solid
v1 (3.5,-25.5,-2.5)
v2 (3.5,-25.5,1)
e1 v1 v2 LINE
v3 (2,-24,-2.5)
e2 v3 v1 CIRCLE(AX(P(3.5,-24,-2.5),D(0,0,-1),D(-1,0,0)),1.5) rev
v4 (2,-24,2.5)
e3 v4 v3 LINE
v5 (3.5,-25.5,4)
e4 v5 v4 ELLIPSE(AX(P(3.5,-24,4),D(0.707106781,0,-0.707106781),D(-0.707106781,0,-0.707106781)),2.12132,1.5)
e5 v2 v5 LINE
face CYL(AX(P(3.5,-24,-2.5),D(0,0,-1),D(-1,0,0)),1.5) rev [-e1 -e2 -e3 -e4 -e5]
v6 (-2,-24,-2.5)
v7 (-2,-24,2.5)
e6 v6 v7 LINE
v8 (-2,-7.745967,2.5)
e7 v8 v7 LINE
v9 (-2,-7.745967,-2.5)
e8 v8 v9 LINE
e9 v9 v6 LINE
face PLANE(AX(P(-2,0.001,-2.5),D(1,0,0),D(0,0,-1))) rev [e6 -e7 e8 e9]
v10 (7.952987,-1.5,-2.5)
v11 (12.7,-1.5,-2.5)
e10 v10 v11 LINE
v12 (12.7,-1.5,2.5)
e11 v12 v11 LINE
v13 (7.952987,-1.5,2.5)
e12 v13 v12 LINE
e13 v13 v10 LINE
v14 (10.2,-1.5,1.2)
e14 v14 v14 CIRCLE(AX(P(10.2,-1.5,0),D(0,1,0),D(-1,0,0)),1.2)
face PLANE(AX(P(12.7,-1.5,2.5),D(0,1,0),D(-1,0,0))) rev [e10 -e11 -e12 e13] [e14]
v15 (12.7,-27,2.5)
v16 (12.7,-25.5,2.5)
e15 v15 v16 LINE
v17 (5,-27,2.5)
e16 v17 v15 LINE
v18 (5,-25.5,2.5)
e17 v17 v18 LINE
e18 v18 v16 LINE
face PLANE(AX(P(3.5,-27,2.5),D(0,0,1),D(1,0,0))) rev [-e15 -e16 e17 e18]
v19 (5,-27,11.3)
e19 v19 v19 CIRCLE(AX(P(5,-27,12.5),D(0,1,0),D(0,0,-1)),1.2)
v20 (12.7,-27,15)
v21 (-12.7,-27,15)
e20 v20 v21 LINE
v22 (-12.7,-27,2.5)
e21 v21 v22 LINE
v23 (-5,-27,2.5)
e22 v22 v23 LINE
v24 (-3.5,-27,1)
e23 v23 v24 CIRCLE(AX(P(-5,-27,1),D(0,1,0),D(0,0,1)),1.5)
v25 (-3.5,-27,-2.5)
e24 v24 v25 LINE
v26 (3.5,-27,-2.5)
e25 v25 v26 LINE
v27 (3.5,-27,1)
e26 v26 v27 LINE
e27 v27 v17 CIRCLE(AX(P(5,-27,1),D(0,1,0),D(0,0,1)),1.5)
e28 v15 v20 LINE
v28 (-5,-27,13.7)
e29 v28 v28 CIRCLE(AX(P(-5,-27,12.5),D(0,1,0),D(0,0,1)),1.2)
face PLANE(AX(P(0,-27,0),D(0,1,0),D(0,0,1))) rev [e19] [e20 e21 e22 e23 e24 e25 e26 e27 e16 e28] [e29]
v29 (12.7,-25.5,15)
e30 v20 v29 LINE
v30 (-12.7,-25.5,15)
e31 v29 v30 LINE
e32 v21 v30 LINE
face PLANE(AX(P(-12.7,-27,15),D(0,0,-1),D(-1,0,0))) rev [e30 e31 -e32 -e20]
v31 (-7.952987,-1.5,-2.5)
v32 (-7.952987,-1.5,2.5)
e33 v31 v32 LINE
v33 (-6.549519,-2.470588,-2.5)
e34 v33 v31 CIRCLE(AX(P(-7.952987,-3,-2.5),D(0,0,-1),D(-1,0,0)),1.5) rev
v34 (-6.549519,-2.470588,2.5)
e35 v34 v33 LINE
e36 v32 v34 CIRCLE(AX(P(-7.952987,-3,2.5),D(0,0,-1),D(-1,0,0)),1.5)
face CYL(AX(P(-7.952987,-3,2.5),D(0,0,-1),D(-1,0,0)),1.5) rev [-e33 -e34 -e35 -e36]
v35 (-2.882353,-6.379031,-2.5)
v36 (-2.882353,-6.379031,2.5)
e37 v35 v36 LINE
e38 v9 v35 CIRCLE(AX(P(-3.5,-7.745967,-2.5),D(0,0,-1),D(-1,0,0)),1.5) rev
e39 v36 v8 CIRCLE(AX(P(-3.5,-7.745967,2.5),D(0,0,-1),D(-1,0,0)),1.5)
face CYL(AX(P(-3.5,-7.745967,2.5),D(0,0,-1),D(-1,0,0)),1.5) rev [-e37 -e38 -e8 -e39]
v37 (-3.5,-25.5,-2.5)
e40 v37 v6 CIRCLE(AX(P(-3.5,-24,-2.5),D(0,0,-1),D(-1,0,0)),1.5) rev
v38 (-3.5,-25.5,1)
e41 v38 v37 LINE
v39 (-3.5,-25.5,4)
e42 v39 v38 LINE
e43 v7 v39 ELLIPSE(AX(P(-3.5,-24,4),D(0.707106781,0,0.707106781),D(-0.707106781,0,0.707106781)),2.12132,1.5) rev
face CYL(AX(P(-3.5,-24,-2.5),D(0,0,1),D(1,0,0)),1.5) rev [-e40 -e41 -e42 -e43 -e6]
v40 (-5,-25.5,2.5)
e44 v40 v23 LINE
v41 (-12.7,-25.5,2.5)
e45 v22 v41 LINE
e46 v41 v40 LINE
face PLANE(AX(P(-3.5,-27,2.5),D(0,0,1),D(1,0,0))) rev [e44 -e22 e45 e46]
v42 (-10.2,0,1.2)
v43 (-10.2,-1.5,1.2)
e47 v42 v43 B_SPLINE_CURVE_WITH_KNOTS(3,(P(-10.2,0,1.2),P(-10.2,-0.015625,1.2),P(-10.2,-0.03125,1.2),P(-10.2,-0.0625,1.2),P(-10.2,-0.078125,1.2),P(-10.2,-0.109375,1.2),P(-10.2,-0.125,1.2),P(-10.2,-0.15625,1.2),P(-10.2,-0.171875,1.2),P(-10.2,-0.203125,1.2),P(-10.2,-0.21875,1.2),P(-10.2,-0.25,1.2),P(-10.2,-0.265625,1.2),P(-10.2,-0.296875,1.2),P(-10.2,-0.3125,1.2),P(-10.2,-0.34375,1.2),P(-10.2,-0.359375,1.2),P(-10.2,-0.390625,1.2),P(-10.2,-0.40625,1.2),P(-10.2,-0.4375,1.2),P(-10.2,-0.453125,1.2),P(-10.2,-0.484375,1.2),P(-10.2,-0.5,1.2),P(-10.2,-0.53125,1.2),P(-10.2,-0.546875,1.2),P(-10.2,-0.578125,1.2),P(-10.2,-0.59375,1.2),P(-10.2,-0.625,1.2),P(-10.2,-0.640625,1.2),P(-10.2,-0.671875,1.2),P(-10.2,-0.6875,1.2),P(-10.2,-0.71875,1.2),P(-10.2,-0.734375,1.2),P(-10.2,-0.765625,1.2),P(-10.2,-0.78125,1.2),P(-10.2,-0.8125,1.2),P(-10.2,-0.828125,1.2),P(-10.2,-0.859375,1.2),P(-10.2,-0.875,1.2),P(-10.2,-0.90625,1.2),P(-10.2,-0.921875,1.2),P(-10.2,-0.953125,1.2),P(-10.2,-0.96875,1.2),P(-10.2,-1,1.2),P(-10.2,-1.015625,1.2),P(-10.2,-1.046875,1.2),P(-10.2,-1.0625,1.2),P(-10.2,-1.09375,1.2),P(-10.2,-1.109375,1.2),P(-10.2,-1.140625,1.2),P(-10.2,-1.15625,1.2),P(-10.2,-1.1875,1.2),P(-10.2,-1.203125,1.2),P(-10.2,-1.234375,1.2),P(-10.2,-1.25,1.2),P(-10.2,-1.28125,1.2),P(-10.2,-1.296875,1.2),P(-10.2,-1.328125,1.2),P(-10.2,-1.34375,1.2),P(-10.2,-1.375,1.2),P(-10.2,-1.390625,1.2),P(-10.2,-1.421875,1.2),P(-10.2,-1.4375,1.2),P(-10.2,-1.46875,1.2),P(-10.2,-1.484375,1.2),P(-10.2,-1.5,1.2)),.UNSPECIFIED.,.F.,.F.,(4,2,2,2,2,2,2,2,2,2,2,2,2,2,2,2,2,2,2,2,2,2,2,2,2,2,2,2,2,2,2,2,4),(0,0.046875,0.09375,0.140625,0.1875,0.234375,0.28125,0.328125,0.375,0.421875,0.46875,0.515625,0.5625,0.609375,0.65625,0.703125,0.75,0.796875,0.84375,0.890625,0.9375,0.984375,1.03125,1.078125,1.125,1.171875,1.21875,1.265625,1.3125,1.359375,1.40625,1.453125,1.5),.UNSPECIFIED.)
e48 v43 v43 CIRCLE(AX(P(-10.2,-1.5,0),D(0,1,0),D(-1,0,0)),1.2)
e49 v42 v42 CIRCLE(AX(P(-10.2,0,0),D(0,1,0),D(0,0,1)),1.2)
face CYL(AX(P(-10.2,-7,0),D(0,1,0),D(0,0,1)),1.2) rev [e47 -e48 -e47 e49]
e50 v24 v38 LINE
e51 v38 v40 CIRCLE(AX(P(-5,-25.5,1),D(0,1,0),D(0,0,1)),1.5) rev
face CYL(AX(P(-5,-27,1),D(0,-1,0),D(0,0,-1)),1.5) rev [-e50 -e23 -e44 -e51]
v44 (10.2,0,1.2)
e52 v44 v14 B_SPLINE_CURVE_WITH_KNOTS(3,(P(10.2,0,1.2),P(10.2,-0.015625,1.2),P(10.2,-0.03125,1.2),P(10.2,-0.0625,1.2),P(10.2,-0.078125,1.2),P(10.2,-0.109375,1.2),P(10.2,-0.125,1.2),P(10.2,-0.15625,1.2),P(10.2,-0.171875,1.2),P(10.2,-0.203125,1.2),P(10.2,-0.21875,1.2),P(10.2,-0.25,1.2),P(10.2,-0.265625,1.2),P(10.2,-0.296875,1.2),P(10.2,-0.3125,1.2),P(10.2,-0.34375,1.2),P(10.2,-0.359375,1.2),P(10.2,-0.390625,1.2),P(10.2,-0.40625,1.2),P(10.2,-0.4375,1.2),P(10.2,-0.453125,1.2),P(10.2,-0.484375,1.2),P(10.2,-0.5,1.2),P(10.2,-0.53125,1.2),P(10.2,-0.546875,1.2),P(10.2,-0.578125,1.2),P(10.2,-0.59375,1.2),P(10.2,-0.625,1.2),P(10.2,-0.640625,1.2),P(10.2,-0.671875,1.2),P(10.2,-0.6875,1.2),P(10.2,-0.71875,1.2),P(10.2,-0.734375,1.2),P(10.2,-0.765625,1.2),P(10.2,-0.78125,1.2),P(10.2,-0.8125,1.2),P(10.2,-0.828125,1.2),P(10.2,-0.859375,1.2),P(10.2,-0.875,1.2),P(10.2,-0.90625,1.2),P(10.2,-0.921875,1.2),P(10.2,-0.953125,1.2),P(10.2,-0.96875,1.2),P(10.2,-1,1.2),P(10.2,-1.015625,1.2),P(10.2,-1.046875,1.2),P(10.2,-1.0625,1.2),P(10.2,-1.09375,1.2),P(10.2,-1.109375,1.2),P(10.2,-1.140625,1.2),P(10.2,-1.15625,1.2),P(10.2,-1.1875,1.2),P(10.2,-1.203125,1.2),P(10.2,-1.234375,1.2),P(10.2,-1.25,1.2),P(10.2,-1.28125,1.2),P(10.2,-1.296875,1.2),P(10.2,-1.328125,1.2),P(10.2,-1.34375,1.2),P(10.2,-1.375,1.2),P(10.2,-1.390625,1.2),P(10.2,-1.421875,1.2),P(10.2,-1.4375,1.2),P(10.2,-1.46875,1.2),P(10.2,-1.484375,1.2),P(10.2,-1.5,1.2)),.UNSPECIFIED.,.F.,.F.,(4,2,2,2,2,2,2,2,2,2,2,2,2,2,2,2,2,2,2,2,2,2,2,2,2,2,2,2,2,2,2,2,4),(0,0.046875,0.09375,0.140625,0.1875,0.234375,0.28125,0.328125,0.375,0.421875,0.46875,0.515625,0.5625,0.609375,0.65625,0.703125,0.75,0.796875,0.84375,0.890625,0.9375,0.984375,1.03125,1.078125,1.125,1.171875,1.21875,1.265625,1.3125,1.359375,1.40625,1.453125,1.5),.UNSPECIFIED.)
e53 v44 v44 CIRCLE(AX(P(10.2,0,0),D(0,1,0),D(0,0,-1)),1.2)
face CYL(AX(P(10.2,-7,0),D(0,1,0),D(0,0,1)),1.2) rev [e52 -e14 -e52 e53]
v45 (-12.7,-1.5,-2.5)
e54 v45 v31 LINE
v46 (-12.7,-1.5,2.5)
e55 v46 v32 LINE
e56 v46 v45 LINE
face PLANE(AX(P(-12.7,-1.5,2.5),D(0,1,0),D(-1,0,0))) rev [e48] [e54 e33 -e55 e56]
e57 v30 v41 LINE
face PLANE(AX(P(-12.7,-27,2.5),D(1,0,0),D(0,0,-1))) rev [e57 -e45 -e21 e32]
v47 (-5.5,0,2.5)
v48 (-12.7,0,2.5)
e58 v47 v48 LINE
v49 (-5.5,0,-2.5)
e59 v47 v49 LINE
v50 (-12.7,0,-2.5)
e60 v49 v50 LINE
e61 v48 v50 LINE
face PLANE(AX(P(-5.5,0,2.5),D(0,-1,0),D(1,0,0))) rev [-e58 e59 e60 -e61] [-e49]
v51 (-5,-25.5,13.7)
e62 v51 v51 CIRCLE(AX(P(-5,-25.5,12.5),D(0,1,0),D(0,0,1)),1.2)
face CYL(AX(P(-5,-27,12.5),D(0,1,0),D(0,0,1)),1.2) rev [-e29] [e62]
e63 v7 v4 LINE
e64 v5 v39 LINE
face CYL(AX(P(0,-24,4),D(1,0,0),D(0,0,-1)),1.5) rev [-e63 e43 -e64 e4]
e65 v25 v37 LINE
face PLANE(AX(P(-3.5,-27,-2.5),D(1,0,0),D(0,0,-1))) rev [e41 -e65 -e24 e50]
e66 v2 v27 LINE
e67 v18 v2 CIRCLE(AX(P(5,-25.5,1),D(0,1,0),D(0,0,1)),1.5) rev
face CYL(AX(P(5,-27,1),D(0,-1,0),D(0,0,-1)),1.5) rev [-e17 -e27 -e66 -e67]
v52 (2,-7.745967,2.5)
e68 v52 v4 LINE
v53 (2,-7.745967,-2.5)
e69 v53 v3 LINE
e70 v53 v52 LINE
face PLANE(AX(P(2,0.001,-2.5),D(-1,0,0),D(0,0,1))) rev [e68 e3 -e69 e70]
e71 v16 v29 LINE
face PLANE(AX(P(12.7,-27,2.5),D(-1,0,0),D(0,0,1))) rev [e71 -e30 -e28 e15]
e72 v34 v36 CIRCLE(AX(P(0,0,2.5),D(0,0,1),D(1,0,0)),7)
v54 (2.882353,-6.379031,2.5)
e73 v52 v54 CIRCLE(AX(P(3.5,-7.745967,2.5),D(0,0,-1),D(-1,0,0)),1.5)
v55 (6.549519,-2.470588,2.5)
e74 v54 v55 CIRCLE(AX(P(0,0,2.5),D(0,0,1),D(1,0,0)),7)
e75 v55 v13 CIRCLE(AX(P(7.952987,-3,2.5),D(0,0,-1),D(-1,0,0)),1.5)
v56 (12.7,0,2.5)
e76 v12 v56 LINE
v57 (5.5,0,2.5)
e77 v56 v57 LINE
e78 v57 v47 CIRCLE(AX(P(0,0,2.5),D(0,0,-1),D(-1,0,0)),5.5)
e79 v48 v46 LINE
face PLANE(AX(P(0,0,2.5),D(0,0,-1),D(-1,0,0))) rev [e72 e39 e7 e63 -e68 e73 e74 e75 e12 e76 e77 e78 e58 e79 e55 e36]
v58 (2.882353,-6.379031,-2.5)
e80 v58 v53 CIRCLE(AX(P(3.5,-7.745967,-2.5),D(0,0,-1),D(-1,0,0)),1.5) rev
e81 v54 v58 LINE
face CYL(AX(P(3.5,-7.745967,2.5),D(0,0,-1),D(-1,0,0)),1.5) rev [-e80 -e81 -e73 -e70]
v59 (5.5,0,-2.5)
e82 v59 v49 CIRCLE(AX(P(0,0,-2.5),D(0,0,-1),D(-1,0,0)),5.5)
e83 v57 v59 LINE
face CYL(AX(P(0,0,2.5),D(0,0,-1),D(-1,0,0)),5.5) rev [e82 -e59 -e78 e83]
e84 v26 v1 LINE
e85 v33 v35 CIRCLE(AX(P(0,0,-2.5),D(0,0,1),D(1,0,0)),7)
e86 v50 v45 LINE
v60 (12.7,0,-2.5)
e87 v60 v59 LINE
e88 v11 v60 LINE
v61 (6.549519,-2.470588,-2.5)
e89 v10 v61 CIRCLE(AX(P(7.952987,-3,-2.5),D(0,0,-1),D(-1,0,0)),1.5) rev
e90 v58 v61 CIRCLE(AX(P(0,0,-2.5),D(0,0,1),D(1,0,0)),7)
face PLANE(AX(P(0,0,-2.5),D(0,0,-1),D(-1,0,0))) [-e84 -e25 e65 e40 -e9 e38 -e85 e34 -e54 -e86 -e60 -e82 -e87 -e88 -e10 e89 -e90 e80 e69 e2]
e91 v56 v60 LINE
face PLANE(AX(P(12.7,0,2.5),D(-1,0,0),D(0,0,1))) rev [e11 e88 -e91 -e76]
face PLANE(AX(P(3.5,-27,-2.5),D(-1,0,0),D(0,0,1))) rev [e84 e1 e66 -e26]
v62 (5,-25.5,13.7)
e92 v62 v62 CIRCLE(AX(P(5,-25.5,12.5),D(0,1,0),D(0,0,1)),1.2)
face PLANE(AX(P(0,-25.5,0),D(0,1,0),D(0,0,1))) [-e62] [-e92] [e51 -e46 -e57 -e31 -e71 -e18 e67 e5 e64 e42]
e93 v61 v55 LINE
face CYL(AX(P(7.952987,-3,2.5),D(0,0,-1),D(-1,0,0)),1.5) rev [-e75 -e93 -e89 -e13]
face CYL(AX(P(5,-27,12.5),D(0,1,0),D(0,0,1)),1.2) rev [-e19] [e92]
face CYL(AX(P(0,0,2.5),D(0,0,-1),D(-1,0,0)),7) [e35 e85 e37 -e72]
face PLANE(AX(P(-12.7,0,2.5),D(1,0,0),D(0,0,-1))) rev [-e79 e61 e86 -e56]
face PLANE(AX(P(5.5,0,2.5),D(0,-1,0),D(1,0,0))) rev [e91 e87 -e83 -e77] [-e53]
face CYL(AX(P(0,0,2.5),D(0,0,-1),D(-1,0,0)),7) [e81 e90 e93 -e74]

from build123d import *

# Parameters (mm, degrees)
BOSS_EXTRUDE1_DEPTH      = 2.5
SKETCH2_R                = 1.2
CUT_EXTRUDE1_DEPTH       = 15.715298162
BOSS_EXTRUDE2_REACH      = 42.215
BOSS_EXTRUDE2_END_RADIUS = 7
BOSS_EXTRUDE2_START      = -25.5
SKETCH6_W                = 4
SKETCH6_H                = 5
BOSS_EXTRUDE4_DEPTH      = 1.5
FILLET1_R                = 1.5
SKETCH8_R                = 1.2
CUT_EXTRUDE3_DEPTH       = 34.395957839


with BuildPart() as part:
    # Sketch1 → Boss-Extrude1 (new, symmetric)
    with BuildSketch(Plane.XY):
        with BuildLine():
            Line((5.5, 0), (12.7, 0))
            Line((12.7, 0), (12.7, -1.5))
            Line((12.7, -1.5), (6.837397166, -1.5))
            ThreePointArc((6.837397166, -1.5), (0, -7), (-6.837397166, -1.5))
            Line((-6.837397166, -1.5), (-12.7, -1.5))
            Line((-12.7, -1.5), (-12.7, 0))
            Line((-12.7, 0), (-5.5, 0))
            ThreePointArc((-5.5, 0), (0, -5.5), (5.5, 0))
        make_face()
    extrude(amount=BOSS_EXTRUDE1_DEPTH, both=True)

    # Sketch2 → Cut-Extrude1 (cut, through all)
    with BuildSketch(Plane(origin=(0, 0, 0), x_dir=(1, 0, 0), z_dir=(0, 1, 0))):
        with Locations(Location((-10.2, 0, 0), (0, 0, 270))):
            Circle(SKETCH2_R)
        with Locations(Location((10.2, 0, 0), (0, 0, 270))):
            Circle(SKETCH2_R)
    extrude(amount=-CUT_EXTRUDE1_DEPTH, mode=Mode.SUBTRACT)

    # Boss-Extrude2: up to this cylinder (the profile starts outside it)
    boss_extrude2_end = Plane(origin=(0, 0, 0), z_dir=(0, 0, -1)) * Cylinder(BOSS_EXTRUDE2_END_RADIUS, 99.43, mode=Mode.PRIVATE)
    # Sketch6 → Boss-Extrude2 (add, up to the surface)
    with BuildSketch(Plane(origin=(0, 0, 0), x_dir=(1, 0, 0), z_dir=(0, 1, 0)).offset(BOSS_EXTRUDE2_START), mode=Mode.PRIVATE) as boss_extrude2_sk1:
        Rectangle(SKETCH6_W, SKETCH6_H)
    boss_extrude2_tool1 = extrude(boss_extrude2_sk1.sketch, amount=BOSS_EXTRUDE2_REACH, mode=Mode.PRIVATE) - boss_extrude2_end
    add(boss_extrude2_tool1.solids().sort_by_distance((0, -25.5, 0))[0])

    # Sketch7 → Boss-Extrude4 (add)
    with BuildSketch(Plane.XZ.offset(25.5)):
        Polygon((3.5, -2.5), (-3.5, -2.5), (-3.5, 2.5), (-12.7, 2.5), (-12.7, 15), (12.7, 15), (12.7, 2.5), (3.5, 2.5), align=None)
    extrude(amount=BOSS_EXTRUDE4_DEPTH)

    # Fillet1
    fillet1_edges = [part.edges().sort_by_distance(p)[0] for p in [
        (2, -25.5, 0),
        (-2, -25.5, 0),
        (-6.837397166, -1.5, 0),
        (-2, -6.708203932, 0),
        (2, -6.708203932, 0),
        (6.837397166, -1.5, 0),
        (3.5, -26.25, 2.5),
        (-3.5, -26.25, 2.5),
        (0, -25.5, 2.5),
    ]]
    fillet(fillet1_edges, radius=FILLET1_R - 0.0001)  # a hair under: the kernel refuses the full size

    # Sketch8 → Cut-Extrude3 (cut, through all)
    with BuildSketch(Plane(origin=(0, 0, 0), x_dir=(1, 0, 0), z_dir=(0, 1, 0))):
        with Locations(Location((-5, -12.5, 0), (0, 0, 270))):
            Circle(SKETCH8_R)
        with Locations(Location((5, -12.5, 0), (0, 0, 270))):
            Circle(SKETCH8_R)
    extrude(amount=-CUT_EXTRUDE3_DEPTH, mode=Mode.SUBTRACT)


solid = part.part
